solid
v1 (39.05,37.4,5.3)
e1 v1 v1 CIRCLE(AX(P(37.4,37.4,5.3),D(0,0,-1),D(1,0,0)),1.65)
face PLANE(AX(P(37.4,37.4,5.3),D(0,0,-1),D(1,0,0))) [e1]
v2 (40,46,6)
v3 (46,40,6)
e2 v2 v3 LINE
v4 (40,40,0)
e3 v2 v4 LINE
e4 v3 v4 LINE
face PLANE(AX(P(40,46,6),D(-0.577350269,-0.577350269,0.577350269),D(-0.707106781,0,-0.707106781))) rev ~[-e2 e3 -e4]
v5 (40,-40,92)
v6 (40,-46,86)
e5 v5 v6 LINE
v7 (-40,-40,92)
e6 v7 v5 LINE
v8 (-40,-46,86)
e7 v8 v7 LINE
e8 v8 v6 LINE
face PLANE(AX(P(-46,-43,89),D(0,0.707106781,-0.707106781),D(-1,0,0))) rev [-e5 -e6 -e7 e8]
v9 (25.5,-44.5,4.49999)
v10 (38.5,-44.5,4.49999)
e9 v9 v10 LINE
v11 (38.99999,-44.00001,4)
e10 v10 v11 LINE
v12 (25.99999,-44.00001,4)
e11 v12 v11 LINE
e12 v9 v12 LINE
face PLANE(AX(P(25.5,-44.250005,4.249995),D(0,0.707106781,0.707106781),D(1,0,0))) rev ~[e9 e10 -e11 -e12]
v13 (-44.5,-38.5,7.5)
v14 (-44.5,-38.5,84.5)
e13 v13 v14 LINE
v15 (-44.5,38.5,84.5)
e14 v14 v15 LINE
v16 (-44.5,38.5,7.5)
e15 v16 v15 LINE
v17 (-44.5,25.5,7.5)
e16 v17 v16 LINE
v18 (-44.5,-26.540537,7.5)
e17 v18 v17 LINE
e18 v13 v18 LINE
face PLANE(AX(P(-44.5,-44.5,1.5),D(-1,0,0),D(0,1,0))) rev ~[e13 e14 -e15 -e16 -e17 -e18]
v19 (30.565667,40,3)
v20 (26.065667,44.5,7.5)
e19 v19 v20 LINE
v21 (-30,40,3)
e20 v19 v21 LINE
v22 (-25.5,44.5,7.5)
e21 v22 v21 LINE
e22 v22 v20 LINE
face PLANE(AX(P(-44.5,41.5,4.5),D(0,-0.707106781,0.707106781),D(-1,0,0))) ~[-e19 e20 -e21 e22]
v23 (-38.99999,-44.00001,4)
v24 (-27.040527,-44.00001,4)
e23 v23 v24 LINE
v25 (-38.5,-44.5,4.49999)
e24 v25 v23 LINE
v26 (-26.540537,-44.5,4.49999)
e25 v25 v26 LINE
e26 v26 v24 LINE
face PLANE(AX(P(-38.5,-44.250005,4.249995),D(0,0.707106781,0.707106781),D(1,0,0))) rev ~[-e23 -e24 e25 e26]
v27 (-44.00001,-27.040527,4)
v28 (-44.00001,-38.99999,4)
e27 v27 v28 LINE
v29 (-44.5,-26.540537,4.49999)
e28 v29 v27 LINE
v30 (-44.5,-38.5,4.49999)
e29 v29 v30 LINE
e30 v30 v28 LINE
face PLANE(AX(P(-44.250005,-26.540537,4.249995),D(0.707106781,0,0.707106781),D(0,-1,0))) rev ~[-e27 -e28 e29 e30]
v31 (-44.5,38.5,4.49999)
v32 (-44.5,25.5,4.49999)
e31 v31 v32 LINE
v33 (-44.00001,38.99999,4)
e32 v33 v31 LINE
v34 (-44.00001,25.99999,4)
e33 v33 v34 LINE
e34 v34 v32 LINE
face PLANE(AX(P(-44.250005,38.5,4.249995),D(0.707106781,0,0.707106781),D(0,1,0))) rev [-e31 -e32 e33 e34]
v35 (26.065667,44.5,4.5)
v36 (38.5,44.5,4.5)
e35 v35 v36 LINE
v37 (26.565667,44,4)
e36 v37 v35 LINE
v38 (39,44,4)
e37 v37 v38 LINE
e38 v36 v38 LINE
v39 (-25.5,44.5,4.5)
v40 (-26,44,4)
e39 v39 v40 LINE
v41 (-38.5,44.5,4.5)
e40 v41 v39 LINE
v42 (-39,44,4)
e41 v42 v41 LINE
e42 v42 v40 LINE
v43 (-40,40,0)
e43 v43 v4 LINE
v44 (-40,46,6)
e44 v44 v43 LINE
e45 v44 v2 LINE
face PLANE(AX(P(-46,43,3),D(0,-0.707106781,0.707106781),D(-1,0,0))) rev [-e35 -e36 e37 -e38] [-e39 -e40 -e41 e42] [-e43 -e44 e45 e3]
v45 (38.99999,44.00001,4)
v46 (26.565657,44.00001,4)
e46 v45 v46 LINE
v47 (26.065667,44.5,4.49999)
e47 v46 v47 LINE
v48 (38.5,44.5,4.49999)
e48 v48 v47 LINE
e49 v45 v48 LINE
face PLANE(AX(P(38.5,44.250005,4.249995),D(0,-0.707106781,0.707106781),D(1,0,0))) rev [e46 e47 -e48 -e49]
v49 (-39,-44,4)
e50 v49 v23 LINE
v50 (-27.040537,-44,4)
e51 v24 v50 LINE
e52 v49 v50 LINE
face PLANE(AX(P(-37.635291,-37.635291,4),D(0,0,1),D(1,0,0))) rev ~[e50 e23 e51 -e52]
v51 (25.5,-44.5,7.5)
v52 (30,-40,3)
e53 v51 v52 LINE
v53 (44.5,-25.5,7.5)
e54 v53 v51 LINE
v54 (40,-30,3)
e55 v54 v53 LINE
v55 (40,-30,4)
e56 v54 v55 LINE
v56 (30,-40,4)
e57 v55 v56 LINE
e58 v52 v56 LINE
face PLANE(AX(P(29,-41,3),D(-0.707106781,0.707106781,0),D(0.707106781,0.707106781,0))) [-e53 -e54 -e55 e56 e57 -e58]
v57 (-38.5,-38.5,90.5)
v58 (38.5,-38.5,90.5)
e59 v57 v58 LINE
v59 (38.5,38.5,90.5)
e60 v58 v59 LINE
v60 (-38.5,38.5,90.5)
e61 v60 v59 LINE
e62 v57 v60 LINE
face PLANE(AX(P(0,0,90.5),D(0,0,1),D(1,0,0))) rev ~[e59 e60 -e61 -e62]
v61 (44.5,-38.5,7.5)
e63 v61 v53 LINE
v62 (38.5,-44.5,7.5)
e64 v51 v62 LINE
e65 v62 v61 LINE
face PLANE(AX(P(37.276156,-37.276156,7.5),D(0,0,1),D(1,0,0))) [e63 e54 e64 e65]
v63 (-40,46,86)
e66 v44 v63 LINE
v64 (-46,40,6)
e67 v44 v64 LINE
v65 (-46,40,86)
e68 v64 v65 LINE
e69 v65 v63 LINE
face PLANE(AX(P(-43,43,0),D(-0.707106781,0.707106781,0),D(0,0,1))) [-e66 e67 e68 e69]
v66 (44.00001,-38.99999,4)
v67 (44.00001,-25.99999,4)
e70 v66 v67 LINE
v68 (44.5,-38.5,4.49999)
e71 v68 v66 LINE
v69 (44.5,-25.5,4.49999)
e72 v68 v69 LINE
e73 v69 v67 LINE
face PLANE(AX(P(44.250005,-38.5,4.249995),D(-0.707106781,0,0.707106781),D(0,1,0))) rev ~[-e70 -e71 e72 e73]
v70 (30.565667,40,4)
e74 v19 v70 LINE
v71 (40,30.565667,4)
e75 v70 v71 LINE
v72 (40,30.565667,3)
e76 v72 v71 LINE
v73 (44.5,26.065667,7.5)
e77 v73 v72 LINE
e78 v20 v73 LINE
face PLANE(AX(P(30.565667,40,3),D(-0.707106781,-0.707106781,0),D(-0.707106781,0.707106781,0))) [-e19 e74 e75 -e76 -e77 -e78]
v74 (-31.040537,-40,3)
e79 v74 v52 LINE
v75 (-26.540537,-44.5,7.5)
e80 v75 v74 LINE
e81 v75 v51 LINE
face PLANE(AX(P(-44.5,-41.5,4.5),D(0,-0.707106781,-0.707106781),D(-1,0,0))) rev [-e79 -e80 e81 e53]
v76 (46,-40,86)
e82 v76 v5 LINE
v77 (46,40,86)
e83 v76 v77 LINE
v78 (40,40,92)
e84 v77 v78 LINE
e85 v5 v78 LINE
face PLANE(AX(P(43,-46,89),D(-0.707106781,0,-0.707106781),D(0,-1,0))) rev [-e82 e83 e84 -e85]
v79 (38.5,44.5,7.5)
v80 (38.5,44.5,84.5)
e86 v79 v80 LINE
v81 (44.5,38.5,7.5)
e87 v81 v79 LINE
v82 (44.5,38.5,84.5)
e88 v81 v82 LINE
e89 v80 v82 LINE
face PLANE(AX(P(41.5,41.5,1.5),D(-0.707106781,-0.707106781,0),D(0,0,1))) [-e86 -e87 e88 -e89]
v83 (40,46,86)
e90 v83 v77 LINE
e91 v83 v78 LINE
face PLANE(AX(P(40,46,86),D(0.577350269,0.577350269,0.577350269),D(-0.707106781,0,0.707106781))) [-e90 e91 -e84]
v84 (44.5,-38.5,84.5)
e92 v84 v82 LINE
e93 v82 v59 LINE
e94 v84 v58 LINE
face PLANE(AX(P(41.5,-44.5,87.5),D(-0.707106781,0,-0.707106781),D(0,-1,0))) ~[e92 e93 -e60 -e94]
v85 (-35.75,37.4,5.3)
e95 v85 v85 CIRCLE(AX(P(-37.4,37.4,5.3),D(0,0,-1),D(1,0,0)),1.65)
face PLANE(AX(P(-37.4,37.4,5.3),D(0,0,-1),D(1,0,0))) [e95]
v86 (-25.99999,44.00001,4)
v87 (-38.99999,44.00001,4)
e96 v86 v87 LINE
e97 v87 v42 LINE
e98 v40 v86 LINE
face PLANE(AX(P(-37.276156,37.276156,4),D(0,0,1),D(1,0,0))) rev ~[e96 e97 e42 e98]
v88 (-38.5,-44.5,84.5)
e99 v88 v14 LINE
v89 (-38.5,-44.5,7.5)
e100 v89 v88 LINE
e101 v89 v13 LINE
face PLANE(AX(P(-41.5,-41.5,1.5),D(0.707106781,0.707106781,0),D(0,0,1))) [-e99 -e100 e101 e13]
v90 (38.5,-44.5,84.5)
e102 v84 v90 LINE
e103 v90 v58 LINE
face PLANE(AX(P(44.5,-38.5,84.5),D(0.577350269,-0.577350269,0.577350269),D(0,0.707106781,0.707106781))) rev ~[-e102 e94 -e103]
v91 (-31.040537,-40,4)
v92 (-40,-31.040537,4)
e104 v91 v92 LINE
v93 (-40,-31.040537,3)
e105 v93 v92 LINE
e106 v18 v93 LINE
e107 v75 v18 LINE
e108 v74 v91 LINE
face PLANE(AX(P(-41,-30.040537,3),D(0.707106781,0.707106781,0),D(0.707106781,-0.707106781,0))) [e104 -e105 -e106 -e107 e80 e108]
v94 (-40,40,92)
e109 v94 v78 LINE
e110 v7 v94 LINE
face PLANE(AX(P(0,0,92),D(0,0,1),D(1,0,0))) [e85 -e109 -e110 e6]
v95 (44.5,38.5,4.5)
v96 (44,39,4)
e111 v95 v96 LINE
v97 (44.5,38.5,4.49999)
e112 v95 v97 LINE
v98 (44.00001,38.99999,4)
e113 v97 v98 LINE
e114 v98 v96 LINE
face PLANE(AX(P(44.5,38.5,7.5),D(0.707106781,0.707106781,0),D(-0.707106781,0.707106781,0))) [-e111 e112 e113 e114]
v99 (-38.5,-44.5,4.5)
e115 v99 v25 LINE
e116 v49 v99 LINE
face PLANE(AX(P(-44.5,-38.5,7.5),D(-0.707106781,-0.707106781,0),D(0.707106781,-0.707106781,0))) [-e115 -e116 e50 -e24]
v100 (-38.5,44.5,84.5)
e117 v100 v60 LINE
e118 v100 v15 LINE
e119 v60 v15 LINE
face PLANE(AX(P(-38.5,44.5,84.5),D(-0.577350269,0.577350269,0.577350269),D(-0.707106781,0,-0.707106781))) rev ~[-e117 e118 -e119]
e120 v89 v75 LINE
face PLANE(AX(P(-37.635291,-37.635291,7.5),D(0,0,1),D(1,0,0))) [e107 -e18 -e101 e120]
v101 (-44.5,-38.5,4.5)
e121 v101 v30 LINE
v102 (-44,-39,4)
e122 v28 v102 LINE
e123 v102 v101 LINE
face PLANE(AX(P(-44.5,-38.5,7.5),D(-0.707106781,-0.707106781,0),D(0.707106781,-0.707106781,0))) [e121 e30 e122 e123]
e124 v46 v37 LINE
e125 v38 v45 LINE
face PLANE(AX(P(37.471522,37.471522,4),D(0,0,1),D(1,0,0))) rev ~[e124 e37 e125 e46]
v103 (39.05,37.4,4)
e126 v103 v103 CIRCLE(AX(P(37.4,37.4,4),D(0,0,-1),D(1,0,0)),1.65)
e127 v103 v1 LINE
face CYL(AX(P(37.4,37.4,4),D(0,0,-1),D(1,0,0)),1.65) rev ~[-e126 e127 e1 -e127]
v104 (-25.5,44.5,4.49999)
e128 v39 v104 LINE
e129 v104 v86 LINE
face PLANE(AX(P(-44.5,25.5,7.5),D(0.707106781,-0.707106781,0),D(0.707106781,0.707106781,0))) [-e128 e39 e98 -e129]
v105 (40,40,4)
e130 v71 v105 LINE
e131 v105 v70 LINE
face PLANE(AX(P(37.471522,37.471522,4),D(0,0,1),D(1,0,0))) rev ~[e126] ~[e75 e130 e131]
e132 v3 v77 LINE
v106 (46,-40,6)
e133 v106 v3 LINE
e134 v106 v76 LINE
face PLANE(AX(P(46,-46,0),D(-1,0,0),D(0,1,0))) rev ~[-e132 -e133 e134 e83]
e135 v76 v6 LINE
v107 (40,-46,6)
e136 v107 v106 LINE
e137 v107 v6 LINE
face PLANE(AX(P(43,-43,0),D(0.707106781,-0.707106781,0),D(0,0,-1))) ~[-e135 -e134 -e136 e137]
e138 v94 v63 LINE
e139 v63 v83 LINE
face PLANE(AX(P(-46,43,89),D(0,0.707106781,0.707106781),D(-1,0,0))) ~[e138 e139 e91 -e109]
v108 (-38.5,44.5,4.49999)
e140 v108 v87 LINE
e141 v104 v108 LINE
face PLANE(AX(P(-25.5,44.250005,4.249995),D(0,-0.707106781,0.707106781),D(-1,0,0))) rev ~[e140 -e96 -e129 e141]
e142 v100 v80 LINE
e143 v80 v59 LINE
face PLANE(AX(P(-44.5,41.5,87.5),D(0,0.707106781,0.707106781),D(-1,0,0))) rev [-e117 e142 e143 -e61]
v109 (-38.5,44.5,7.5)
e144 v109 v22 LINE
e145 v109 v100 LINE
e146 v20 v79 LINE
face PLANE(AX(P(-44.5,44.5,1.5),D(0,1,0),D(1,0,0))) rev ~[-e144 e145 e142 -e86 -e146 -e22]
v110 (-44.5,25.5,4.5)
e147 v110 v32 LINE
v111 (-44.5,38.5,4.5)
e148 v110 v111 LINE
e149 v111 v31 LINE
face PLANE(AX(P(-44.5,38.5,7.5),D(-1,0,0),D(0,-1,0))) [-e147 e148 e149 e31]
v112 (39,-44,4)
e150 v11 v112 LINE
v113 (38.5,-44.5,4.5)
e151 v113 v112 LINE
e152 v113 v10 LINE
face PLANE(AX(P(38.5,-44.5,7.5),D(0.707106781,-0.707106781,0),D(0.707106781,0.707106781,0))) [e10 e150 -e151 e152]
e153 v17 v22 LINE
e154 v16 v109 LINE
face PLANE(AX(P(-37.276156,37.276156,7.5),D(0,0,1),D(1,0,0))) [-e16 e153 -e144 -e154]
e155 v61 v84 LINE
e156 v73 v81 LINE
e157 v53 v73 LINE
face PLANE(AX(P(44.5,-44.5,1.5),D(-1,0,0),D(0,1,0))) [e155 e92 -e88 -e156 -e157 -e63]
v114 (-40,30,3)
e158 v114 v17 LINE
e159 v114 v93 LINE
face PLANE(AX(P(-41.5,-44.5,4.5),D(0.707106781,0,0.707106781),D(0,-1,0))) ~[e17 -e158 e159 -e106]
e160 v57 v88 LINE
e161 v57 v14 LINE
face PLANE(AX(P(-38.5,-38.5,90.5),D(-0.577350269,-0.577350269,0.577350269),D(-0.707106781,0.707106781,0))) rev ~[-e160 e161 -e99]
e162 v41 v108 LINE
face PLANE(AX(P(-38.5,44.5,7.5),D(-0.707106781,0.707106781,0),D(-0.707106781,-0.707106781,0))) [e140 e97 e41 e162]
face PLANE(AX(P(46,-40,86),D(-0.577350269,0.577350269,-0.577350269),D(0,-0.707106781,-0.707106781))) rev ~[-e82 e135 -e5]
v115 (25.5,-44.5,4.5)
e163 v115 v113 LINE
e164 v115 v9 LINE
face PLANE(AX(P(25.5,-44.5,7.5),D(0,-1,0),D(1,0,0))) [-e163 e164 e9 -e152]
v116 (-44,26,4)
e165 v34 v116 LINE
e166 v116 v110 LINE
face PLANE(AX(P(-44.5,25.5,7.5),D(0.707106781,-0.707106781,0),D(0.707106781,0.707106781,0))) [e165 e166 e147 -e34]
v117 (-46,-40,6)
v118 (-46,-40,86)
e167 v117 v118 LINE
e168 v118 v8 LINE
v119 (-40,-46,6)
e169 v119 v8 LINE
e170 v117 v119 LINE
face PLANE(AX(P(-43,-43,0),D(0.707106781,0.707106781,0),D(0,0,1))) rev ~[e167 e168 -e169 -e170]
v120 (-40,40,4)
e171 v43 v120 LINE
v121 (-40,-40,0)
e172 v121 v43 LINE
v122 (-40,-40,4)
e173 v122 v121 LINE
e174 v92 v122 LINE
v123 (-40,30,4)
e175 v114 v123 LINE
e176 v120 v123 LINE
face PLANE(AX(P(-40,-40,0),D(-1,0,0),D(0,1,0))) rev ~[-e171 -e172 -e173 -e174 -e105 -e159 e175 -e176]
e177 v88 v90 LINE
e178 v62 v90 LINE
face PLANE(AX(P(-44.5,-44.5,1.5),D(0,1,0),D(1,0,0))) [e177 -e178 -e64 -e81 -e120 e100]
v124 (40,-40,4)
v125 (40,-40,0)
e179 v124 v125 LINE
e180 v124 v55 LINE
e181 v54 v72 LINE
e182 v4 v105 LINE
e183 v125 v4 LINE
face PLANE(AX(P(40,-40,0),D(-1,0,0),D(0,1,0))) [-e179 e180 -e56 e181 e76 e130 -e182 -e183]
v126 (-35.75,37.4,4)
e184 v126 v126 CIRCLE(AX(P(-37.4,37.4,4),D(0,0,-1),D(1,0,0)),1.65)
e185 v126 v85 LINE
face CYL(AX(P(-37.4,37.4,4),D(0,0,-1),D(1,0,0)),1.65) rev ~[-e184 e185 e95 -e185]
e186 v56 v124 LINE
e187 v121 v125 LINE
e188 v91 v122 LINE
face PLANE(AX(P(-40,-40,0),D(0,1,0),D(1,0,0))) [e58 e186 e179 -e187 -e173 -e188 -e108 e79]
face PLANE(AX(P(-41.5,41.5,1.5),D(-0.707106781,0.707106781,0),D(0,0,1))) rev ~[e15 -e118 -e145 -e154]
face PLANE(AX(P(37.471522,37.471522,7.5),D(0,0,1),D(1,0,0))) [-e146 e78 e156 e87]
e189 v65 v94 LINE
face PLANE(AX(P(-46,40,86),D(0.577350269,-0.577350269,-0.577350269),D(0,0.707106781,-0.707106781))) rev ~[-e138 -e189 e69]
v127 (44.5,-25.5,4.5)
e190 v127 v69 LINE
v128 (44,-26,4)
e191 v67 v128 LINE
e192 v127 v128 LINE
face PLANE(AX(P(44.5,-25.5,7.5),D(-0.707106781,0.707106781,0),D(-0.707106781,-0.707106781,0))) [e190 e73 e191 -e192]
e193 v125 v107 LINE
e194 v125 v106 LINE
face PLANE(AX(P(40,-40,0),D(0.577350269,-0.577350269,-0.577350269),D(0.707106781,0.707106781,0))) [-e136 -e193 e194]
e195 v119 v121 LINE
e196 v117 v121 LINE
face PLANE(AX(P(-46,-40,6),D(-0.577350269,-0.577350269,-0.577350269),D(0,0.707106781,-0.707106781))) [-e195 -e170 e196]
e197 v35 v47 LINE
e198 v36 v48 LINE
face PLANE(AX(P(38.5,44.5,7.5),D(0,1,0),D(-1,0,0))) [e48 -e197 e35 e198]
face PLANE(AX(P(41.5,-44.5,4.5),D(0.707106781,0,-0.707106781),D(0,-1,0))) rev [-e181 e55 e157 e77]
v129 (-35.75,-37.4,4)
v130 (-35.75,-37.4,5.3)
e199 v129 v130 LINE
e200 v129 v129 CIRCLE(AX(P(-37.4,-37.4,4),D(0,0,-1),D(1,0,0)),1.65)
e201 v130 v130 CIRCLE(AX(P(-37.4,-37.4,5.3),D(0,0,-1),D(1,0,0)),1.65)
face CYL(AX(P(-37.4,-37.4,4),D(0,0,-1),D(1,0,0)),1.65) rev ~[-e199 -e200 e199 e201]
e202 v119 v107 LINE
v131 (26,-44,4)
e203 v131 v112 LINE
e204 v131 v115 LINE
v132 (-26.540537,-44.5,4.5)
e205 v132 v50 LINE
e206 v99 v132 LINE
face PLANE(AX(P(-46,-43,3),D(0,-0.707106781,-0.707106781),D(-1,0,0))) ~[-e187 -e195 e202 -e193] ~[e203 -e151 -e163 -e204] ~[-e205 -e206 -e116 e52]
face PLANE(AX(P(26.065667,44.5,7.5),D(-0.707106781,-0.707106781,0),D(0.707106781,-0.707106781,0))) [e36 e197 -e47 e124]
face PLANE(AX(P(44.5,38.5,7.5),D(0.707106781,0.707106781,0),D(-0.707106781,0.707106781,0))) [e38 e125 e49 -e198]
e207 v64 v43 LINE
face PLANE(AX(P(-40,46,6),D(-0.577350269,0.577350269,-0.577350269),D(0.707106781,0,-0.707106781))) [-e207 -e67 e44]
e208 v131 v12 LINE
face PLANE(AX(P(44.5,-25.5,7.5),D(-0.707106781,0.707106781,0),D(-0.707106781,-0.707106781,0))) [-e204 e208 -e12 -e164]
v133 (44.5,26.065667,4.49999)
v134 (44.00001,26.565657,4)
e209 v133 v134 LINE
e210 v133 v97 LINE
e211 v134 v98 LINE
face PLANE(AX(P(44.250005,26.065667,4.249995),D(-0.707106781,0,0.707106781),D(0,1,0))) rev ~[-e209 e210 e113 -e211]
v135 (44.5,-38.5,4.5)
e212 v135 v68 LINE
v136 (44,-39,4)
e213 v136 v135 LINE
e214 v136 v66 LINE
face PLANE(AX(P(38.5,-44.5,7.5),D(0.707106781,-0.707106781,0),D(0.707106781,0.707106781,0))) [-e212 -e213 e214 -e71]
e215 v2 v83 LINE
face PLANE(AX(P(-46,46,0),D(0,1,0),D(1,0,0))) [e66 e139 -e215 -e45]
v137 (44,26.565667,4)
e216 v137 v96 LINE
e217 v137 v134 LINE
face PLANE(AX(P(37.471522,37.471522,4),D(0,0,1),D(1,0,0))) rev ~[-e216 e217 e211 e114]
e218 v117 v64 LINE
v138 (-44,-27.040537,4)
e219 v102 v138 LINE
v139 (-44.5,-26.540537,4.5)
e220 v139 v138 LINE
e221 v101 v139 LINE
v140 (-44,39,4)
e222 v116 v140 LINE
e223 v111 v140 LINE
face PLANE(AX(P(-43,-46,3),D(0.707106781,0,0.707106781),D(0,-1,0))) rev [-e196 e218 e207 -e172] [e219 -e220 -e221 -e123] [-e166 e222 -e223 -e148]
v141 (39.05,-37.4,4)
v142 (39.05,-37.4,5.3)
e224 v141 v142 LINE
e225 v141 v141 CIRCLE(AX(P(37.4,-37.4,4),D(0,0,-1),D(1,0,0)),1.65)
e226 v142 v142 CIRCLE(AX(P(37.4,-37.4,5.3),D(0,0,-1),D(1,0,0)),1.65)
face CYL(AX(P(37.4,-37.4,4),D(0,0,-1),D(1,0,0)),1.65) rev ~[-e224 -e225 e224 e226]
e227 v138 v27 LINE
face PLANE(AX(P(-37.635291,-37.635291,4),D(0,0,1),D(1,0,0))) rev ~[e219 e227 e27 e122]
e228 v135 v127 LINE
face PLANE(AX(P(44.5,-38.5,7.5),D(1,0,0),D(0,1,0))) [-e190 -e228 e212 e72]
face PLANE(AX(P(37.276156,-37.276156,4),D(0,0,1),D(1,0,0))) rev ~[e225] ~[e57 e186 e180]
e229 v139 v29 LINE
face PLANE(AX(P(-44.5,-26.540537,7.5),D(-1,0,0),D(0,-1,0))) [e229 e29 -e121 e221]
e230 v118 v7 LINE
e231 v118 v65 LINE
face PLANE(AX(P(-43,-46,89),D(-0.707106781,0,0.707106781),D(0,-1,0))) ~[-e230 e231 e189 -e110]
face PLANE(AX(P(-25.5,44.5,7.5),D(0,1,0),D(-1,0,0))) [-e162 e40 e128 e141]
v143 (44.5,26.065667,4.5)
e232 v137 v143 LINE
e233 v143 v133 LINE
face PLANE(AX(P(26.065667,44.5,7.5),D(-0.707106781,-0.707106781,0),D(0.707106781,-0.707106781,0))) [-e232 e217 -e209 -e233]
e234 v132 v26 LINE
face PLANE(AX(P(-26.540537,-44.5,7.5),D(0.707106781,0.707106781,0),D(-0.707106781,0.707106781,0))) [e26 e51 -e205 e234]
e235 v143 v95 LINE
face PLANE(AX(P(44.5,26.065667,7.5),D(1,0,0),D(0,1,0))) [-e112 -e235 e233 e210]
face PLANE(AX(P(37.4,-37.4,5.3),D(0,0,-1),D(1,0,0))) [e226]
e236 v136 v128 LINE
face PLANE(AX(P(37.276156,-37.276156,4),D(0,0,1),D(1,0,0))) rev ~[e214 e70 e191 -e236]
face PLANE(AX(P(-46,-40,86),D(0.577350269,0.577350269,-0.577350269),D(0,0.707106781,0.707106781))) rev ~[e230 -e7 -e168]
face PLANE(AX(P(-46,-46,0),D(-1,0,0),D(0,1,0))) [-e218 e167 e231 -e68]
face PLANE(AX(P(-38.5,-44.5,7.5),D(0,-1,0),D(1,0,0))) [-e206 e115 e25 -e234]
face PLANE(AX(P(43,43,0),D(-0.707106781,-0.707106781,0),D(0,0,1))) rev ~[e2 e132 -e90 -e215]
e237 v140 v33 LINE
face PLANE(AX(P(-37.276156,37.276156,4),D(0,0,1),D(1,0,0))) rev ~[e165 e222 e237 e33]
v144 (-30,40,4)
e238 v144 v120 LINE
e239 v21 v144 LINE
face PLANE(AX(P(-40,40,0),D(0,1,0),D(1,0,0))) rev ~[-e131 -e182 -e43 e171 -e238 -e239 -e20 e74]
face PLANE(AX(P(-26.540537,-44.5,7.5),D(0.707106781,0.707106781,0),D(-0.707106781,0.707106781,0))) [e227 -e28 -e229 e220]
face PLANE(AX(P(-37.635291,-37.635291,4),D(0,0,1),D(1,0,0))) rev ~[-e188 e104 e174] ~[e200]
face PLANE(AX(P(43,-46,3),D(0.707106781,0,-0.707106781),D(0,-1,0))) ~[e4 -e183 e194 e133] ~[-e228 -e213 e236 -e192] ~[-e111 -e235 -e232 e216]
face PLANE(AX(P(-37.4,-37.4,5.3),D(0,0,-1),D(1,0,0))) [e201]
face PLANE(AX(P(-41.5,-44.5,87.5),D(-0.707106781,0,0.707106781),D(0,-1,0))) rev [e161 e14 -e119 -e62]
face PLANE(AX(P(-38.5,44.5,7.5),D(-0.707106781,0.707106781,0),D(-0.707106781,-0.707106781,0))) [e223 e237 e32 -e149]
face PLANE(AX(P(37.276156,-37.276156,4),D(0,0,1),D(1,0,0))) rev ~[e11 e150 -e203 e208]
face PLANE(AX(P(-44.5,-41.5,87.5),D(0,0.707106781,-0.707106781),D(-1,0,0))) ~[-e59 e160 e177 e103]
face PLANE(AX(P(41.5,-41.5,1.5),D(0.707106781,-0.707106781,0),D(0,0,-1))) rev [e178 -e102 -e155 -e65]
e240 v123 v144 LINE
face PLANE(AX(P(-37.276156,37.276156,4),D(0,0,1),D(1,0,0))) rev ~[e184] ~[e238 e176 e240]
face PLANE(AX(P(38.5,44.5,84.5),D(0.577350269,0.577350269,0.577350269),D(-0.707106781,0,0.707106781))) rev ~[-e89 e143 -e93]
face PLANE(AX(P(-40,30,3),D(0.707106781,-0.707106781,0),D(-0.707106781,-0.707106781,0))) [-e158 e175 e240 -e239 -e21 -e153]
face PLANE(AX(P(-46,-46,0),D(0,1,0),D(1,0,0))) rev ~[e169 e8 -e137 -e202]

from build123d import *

# Parameters (mm, degrees)
F0_W      = 92
F0_H      = 92
F1_DEPTH  = 92
F2_SIZE   = 6
F3_DEPTH  = 80
F4_W      = 89
F4_H      = 89
F5_DEPTH  = 89
F6_SIZE   = 6
F17_DEPTH = 3.5
F10_R     = 1.65
F11_DEPTH = 1.3
F12_SIZE  = 0.49999
F15_DEPTH = 1.5


# Not quite as in the source:
# - a fillet or chamfer is up to 0.001 mm smaller than in the source, because OpenCascade refuses the exact size


with BuildPart() as f1:
    # F0 (on Top) → F1 (new body)
    with BuildSketch(Plane.XY):
        Rectangle(F0_W, F0_H)
    extrude(amount=F1_DEPTH)

    # F2
    f2_edges = [f1.edges().sort_by_distance(p)[0] for p in [
        (0, -46, 92),
        (46, 0, 92),
        (46, -46, 46),
        (0, -46, 0),
        (-46, -46, 46),
        (46, 0, 0),
        (46, 46, 46),
        (0, 46, 92),
        (-46, 0, 92),
        (-46, 0, 0),
        (-46, 46, 46),
        (0, 46, 0),
    ]]
    chamfer(f2_edges, length=F2_SIZE)

    # F3 (cut): a face of the model
    f3_faces = [f1.faces().sort_by_distance(p)[0] for p in [
        (0, 0, 0),
    ]]
    extrude(f3_faces, amount=-F3_DEPTH, mode=Mode.SUBTRACT)


with BuildPart() as f5:
    # F4 (on Top) → F5 (new body)
    with BuildSketch(Plane.XY):
        Rectangle(F4_W, F4_H)
    extrude(amount=F5_DEPTH)

    # F6
    f6_edges = [f5.edges().sort_by_distance(p)[0] for p in [
        (-44.5, -44.5, 44.5),
        (0, -44.5, 89),
        (44.5, -44.5, 44.5),
        (0, -44.5, 0),
        (44.5, 0, 89),
        (44.5, 44.5, 44.5),
        (44.5, 0, 0),
        (0, 44.5, 0),
        (-44.5, 0, 89),
        (0, 44.5, 89),
        (-44.5, 44.5, 44.5),
        (-44.5, 0, 0),
    ]]
    chamfer(f6_edges, length=F6_SIZE)


with BuildPart() as f5_1:
    # F7: moved
    add(f5.part.moved(Location((0, 0, 1.5))))


with BuildPart() as f1_1:
    add(f1.part)

    # F8: cut F5
    add(f5_1.part, mode=Mode.SUBTRACT)

    # F16 (on offset) → F17 (join)
    with BuildSketch(Plane.XY.offset(7.5)):
        Polygon((44.5, 26.0656665673), (44.5, 38.5), (38.5, 44.5), (26.0656665673, 44.5), (30.5656665673, 40), (40.5656665673, 30), align=None)
        Polygon((-25.5, 44.5), (-38.5, 44.5), (-44.5, 38.5), (-44.5, 25.5), (-40, 30), (-30, 40), align=None)
        Polygon((25.5, -44.5), (38.5, -44.5), (44.5, -38.5), (44.5, -25.5), (40, -30), (30, -40), align=None)
        Polygon((-44.5, -38.5), (-38.5, -44.5), (-26.5405371355, -44.5), (-30, -41.0405371355), (-40, -31.0405371355), (-44.5, -26.5405371355), align=None)
    extrude(amount=-F17_DEPTH)

    # F10 (on face) → F11 (cut)
    with BuildSketch(Plane(origin=(0, 0, 4), x_dir=(1, 0, 0), z_dir=(0, 0, -1))):
        with Locations((37.4, 37.4)):
            Circle(F10_R)
        with Locations((-37.4, 37.4)):
            Circle(F10_R)
        with Locations((-37.4, -37.4)):
            Circle(F10_R)
        with Locations((37.4, -37.4)):
            Circle(F10_R)
    extrude(amount=-F11_DEPTH, mode=Mode.SUBTRACT)

    # F12 (size 0.5 in the source; OpenCascade refuses exactly that, so slightly less here)
    f12_edges = [f1_1.edges().sort_by_distance(p)[0] for p in [
        (-32, 44.5, 4),
        (-44.5, 32, 4),
        (32.282833, 44.5, 4),
        (44.5, 32.282833, 4),
        (44.5, -32, 4),
        (-32.520269, -44.5, 4),
        (-44.5, -32.520269, 4),
        (32, -44.5, 4),
    ]]
    chamfer(f12_edges, length=F12_SIZE)

    # F14 (on face) → F15 (join)
    with BuildSketch(Plane(origin=(0, 0, 3), x_dir=(1, 0, 0), z_dir=(0, 0, -1))):
        Polygon((-41, 38.5), (-41, 30.0405371355), (-40, 31.0405371355), (-40, 39.5), (-40, 40), (-39.5, 40), (-31.0405371355, 40), (-30.0405371355, 41), (-38.5, 41), (-40, 41), (-41, 40), align=None)
        Polygon((38.5, 41), (29, 41), (30, 40), (39.5, 40), (40, 40), (40, 39.5), (40, 30), (41, 29), (41, 38.5), (41, 40), (40, 41), align=None)
        Polygon((41, -38.5), (41, -29.5656665673), (40, -30.5656665673), (40, -40), (30.5656665673, -40), (29.5656665673, -41), (38.5, -41), (40, -41), (41, -40), align=None)
        Polygon((-38.5, -41), (-29, -41), (-30, -40), (-40, -40), (-40, -30), (-41, -29), (-41, -38.5), (-41, -40), (-40, -41), align=None)
    extrude(amount=-F15_DEPTH)


solid = f1_1.part
